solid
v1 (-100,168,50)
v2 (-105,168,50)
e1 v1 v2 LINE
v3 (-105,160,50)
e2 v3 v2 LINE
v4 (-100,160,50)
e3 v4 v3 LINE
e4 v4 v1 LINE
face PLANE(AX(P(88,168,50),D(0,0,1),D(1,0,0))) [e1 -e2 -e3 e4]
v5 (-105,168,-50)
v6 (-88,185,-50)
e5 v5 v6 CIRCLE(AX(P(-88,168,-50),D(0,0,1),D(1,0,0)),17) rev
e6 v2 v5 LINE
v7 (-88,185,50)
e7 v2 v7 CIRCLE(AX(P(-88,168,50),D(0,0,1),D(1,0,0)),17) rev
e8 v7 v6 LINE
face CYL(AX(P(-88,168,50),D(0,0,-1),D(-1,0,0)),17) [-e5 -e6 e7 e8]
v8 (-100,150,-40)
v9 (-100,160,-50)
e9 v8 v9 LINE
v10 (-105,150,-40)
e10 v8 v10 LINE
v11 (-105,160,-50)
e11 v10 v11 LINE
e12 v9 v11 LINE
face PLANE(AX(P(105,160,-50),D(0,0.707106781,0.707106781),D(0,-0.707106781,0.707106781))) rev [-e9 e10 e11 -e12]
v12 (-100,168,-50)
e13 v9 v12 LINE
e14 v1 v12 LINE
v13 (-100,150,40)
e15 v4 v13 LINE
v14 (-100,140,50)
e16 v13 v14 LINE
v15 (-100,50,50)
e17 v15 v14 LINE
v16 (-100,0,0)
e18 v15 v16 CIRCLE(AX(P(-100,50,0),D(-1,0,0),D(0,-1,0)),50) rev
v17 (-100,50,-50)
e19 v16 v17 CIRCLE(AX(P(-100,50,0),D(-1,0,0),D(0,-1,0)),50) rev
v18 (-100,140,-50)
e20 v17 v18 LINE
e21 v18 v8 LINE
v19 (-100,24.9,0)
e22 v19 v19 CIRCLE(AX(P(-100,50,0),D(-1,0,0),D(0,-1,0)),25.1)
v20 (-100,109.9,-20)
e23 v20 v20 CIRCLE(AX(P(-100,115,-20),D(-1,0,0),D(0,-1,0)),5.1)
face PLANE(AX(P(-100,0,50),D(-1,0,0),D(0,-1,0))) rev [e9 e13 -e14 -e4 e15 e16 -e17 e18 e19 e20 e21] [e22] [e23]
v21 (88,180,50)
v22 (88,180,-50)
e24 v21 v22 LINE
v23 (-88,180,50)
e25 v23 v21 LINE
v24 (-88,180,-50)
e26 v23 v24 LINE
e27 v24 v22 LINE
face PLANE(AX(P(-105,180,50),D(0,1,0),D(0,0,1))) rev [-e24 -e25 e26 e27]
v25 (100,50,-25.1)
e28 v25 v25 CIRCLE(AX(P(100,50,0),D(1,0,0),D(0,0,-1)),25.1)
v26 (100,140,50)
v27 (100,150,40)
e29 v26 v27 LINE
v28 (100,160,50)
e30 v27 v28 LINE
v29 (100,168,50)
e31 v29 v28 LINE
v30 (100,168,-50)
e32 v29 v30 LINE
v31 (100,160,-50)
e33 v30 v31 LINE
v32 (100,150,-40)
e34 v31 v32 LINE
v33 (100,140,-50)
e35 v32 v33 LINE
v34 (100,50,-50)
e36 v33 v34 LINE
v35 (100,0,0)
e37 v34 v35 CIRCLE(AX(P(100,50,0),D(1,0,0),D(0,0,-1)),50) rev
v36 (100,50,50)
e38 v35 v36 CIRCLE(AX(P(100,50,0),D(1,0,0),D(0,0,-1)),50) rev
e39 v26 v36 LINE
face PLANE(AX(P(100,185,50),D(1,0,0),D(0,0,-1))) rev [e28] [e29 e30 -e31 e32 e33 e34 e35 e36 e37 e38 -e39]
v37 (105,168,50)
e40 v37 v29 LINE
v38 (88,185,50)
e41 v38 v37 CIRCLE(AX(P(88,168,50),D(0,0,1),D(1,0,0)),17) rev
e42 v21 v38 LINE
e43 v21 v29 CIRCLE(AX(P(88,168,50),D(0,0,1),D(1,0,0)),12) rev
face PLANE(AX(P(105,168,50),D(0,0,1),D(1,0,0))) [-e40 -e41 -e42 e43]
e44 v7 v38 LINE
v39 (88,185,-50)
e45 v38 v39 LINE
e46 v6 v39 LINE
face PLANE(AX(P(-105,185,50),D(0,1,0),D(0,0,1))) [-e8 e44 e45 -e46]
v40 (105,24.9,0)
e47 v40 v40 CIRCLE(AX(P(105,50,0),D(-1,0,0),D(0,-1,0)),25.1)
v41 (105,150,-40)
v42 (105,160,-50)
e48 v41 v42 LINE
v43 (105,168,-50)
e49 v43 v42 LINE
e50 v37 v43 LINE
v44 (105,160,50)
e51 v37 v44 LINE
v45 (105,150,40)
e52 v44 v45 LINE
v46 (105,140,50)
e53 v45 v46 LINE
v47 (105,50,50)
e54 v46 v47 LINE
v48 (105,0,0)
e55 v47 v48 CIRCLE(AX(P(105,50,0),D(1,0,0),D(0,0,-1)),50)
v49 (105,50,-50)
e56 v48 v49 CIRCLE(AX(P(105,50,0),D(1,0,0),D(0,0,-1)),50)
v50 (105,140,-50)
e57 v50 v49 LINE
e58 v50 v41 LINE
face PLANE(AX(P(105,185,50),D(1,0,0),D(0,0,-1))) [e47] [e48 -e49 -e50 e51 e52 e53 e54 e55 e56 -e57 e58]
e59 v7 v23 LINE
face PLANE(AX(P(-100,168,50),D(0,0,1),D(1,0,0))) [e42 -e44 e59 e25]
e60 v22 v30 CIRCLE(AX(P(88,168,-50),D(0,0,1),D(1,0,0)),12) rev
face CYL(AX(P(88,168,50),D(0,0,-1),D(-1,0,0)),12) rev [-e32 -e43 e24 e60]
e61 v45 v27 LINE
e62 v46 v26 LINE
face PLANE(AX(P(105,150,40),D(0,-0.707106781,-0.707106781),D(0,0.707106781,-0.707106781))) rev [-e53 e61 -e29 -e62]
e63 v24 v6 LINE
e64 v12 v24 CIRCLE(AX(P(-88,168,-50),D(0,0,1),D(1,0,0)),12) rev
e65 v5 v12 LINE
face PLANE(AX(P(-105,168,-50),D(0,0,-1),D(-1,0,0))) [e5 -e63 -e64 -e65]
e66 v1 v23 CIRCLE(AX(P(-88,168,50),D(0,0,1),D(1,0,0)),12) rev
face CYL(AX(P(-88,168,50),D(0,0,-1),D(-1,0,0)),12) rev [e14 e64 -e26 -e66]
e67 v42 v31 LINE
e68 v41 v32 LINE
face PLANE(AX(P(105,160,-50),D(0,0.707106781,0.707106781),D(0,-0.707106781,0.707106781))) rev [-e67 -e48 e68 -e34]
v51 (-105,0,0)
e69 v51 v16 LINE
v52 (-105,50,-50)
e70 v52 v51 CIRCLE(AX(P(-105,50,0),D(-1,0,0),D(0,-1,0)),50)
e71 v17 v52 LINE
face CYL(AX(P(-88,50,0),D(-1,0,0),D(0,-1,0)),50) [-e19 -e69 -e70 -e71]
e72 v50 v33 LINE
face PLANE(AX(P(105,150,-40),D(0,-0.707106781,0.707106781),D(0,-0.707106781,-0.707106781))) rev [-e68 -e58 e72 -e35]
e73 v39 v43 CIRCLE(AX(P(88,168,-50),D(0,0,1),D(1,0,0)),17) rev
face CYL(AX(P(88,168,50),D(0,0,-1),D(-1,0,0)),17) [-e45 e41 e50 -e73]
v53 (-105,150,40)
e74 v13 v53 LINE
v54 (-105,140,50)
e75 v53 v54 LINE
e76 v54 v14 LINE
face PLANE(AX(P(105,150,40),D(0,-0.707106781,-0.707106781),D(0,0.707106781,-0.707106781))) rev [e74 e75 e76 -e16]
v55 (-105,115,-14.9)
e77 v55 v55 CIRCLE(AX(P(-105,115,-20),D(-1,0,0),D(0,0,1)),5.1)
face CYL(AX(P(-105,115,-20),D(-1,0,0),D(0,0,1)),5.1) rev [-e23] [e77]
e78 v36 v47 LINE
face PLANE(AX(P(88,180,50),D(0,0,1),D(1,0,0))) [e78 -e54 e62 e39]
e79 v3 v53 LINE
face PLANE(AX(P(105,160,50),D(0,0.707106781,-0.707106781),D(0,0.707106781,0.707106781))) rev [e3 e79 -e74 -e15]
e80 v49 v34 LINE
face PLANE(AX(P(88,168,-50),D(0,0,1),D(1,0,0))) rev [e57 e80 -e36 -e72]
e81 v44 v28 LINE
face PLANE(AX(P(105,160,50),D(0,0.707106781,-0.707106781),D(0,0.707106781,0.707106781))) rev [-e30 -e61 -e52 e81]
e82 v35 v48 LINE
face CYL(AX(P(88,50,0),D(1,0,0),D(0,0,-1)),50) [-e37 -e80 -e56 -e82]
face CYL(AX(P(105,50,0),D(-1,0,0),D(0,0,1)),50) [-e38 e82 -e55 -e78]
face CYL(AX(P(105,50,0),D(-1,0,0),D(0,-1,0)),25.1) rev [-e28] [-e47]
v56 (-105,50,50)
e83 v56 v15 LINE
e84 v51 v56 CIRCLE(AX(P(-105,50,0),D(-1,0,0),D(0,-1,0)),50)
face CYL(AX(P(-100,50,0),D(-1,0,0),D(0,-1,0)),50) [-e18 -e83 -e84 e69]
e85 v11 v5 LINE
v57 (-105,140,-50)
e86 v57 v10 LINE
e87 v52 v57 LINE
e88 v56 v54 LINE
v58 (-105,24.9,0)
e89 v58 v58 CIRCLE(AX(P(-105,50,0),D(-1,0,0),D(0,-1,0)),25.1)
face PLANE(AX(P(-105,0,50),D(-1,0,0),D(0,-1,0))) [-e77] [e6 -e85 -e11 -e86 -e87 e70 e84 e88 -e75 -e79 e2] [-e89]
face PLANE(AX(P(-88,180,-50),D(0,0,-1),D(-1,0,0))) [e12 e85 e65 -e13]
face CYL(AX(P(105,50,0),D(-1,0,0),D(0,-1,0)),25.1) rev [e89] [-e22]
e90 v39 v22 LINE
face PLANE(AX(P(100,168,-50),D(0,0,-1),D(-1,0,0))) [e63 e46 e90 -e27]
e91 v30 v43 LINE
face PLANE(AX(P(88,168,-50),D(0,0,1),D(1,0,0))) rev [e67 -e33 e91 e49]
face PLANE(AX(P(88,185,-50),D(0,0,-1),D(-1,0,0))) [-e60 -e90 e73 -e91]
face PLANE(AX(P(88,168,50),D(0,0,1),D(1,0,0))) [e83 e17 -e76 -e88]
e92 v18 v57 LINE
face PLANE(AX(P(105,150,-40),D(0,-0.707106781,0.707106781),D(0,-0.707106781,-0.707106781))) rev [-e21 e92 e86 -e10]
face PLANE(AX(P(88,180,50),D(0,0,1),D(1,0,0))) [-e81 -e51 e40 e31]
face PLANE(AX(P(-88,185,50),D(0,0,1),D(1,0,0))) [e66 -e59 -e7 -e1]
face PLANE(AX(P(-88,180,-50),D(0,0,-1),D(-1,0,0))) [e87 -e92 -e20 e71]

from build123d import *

# Parameters (mm, degrees)
BASE_FLANGE1_DEPTH          = 50
CUT_EXTRUDE1_DEPTH          = 285.297379517
CUT_EXTRUDE1_DEPTH_BACK     = 285.297379517
M12X1_75_TAPPED_HOLE1_D     = 10.2
M12X1_75_TAPPED_HOLE1_DEPTH = 5
BREAK_CORNER2_START         = -105
BREAK_CORNER2_DEPTH         = 210
CUT_EXTRUDE2_DEPTH          = 285.297379517
CUT_EXTRUDE2_DEPTH_BACK     = 285.297379517
SKETCH10_R                  = 25.1


# Read off the part's stored shape, not the designer's step: Break-Corner2
# Sheet-metal steps are written as plain solids
with BuildPart() as part:
    # Sketch1 → Base-Flange1 (new, symmetric)
    with BuildSketch(Plane.XY):
        with BuildLine():
            Line((-105, 0), (-105, 168))
            ThreePointArc((-105, 168), (-100.02081528, 180.02081528), (-88, 185))
            Line((-88, 185), (88, 185))
            ThreePointArc((88, 185), (100.02081528, 180.02081528), (105, 168))
            Line((105, 168), (105, 0))
            Line((105, 0), (100, 0))
            Line((100, 0), (100, 168))
            ThreePointArc((100, 168), (96.485281374, 176.485281374), (88, 180))
            Line((88, 180), (-88, 180))
            ThreePointArc((-88, 180), (-96.485281374, 176.485281374), (-100, 168))
            Line((-100, 168), (-100, 0))
            Line((-100, 0), (-105, 0))
        make_face()
    extrude(amount=BASE_FLANGE1_DEPTH, both=True)

    # Sketch6 → Cut-Extrude1 (cut, two sides: drawn at the far end of the back side and taken through both)
    with BuildSketch(Plane.ZY.offset(105).offset(-CUT_EXTRUDE1_DEPTH_BACK)):
        Polygon((-50, 160), (-40, 150), (-50, 140), align=None)
        Polygon((50, 160), (50, 140), (40, 150), align=None)
    extrude(amount=CUT_EXTRUDE1_DEPTH + CUT_EXTRUDE1_DEPTH_BACK, mode=Mode.SUBTRACT)

    # M12x1.75 Tapped Hole1
    with Locations(Plane.ZY.offset(105)):
        with Locations((-20, 115)):
            Hole(M12X1_75_TAPPED_HOLE1_D / 2, depth=M12X1_75_TAPPED_HOLE1_DEPTH)

    # Break-Corner2 outline → Break-Corner2 (cut)
    with BuildSketch(Plane.YZ.offset(BREAK_CORNER2_START)):
        with BuildLine():
            Line((0, -50), (50, -50))
            ThreePointArc((50, -50), (14.644660941, -35.355339059), (0, 0))
            Line((0, 0), (0, -50))
        make_face()
        with BuildLine():
            Line((0, 50), (0, 0))
            ThreePointArc((0, 0), (14.644660941, 35.355339059), (50, 50))
            Line((50, 50), (0, 50))
        make_face()
    extrude(amount=BREAK_CORNER2_DEPTH, mode=Mode.SUBTRACT)

    # Sketch10 → Cut-Extrude2 (cut, two sides: drawn at the far end of the back side and taken through both)
    with BuildSketch(Plane.ZY.offset(105).offset(-CUT_EXTRUDE2_DEPTH_BACK)):
        with Locations(Location((0, 50, 0), (0, 0, 270))):
            Circle(SKETCH10_R)
    extrude(amount=CUT_EXTRUDE2_DEPTH + CUT_EXTRUDE2_DEPTH_BACK, mode=Mode.SUBTRACT)


solid = part.part
